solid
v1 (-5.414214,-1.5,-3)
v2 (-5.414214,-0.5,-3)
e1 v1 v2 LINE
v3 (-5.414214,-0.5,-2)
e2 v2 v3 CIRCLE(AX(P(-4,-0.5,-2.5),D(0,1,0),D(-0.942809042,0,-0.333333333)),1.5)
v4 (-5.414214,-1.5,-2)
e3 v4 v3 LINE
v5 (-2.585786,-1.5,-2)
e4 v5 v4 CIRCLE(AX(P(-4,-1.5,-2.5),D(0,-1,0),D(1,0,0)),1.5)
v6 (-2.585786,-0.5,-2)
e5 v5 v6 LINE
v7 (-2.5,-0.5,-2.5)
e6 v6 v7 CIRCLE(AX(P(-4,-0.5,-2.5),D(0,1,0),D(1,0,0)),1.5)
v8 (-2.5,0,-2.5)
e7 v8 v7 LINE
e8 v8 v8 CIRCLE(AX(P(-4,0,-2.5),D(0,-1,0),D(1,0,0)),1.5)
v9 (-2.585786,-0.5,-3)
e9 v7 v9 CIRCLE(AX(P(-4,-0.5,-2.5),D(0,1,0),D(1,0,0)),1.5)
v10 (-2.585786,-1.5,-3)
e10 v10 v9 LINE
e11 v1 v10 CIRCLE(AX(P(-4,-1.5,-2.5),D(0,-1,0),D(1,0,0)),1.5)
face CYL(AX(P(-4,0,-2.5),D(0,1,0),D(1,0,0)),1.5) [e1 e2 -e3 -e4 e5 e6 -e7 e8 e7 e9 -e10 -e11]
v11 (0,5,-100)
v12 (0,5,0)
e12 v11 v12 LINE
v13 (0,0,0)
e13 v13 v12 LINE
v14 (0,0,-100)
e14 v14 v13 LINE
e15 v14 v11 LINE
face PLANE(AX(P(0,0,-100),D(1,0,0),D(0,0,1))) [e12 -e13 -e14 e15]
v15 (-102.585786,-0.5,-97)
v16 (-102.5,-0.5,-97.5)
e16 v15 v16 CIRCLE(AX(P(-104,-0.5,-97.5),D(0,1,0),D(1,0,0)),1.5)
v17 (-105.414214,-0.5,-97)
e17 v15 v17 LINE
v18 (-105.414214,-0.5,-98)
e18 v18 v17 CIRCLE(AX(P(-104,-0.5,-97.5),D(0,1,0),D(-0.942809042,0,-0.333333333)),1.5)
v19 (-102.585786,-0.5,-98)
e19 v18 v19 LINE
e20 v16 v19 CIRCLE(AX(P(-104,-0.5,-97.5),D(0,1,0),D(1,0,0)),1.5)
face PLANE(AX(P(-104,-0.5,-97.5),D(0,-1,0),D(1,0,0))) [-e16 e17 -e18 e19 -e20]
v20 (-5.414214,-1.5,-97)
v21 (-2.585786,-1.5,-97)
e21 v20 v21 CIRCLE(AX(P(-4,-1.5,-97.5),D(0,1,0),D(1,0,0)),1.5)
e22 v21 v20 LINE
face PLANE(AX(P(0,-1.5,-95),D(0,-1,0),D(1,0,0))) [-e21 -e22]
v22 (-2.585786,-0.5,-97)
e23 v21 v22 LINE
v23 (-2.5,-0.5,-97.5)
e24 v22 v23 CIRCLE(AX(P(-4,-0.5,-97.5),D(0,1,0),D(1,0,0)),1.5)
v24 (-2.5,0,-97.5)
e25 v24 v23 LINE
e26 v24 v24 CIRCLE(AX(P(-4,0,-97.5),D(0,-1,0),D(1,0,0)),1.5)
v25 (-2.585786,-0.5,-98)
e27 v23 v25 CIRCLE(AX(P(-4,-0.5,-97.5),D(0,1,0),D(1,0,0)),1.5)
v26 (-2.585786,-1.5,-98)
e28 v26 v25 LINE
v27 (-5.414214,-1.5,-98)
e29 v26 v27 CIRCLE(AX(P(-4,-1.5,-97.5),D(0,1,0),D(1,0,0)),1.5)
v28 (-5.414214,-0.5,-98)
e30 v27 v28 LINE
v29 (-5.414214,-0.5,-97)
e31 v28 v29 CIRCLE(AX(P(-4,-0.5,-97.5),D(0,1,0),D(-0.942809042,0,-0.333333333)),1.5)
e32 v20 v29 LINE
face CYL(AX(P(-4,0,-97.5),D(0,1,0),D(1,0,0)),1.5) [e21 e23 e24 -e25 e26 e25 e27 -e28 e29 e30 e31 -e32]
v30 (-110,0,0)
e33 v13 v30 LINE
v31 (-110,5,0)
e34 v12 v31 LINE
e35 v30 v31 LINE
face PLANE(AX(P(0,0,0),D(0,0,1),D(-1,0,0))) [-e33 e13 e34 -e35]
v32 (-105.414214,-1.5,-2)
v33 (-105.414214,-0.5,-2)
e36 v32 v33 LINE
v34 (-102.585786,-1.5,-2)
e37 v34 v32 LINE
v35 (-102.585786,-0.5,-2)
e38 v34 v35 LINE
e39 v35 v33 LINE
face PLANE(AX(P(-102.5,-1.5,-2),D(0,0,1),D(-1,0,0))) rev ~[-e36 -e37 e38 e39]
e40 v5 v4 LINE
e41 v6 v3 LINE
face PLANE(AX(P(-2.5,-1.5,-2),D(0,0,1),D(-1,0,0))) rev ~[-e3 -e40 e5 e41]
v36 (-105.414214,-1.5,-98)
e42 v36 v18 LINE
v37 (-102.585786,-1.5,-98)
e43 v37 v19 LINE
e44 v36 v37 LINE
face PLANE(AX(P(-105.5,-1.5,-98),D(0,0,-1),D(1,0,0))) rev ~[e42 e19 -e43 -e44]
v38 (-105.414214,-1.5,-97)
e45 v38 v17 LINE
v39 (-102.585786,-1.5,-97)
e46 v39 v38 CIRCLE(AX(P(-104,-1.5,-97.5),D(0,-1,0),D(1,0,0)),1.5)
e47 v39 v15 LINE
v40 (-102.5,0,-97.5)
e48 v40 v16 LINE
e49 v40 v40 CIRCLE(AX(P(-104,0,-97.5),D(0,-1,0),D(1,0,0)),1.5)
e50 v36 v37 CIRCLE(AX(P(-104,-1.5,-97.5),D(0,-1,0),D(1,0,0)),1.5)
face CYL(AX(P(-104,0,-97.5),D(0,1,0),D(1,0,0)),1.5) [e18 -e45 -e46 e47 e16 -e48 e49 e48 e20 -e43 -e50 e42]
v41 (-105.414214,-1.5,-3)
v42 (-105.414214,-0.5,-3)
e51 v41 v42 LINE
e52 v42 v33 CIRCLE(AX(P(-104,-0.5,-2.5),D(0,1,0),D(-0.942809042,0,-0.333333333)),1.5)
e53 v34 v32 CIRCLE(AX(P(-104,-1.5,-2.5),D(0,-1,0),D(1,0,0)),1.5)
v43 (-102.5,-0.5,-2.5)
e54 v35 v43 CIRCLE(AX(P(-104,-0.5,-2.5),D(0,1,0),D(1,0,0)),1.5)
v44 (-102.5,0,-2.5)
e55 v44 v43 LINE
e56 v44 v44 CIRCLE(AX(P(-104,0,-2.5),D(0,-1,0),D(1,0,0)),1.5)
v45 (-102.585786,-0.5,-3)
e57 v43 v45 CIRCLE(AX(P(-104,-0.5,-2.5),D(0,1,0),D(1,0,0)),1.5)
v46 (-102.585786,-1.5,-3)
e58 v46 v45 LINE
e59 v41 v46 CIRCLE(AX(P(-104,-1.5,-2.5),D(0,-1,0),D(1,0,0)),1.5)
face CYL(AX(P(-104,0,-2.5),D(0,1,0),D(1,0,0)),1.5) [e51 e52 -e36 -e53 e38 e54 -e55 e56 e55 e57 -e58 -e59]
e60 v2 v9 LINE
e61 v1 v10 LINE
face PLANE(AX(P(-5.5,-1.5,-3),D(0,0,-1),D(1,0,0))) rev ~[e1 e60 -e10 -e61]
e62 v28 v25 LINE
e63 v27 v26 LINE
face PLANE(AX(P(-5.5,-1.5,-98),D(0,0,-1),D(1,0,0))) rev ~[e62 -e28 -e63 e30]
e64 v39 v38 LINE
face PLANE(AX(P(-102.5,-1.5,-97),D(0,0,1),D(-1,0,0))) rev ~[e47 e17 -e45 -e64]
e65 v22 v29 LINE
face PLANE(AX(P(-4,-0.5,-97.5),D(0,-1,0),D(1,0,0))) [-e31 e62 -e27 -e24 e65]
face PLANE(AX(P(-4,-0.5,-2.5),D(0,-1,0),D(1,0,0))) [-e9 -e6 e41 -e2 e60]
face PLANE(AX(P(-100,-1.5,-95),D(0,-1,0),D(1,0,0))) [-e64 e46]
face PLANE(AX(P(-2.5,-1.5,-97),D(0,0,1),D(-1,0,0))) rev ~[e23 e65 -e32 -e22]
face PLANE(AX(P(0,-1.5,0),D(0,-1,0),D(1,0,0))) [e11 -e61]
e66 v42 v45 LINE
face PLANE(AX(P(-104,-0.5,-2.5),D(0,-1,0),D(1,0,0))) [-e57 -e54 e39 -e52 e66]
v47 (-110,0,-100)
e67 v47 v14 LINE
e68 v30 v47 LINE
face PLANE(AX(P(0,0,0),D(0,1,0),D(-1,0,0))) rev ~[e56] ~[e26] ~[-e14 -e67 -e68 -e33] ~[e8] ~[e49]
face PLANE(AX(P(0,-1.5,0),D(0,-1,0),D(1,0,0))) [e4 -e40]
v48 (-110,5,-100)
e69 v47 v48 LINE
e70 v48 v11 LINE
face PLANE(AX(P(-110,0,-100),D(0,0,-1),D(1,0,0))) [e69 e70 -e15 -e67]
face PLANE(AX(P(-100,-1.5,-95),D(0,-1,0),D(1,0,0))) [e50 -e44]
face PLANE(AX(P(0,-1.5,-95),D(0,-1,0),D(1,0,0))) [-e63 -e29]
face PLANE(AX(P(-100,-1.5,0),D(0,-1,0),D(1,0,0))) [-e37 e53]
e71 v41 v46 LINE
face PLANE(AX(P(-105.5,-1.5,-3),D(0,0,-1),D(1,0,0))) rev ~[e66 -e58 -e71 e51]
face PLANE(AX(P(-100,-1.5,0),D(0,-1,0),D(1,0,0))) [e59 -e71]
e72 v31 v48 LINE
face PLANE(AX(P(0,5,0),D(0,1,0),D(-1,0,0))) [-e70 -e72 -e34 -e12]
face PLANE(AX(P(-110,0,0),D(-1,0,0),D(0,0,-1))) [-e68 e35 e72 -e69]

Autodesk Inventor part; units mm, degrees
ref_plane "YZ Plane" through (0, 0, 0) normal (1, 0, 0) x (0, 1, 0)
ref_plane "XZ Plane" through (0, 0, 0) normal (0, 1, 0) x (-1, 0, 0)
ref_plane "XY Plane" through (0, 0, 0) normal (0, 0, 1) x (1, 0, 0)
sketch "Sketch1" plane through (0, 0, 0) normal (0, 1, 0) x (-1, 0, 0)
  line L0 (0, 0) -> (110, 0)
  line L1 (110, 0) -> (110, -100)
  line L2 (110, -100) -> (0, -100)
  line L3 (0, -100) -> (0, 0)
  dimension "d0" = 110
  dimension "d1" = 100
extrude "Extrusion1" add sketch "Sketch1" along normal blind 5
sketch "Sketch2" plane through (0, 5, 0) normal (0, 1, 0) x (1, 0, 0)
  point P0 (0, 0)
sketch "Sketch3" plane through (0, 0, 0) normal (0, -1, 0) x (1, 0, 0)
  circle A0 centre (-4, -2.5) radius 1.5
  point P0 (0, 0)
  dimension "d4" = 3
extrude "Extrusion2" add sketch "Sketch3" along normal blind 1.5
sketch "Sketch4" plane through (-4, -1.5, -2.5) normal (0, -1, 0) x (1, 0, 0)
  point P0 (4, 2.5)
sketch "Sketch5" plane through (-4, -1.5, -2.5) normal (0, -1, 0) x (1, 0, 0)
  line L0 (1.5, 0.5) -> (-1.5, 0.5)
  line L1 (-1.5, 0.5) -> (-1.5, -0.5)
  line L2 (-1.5, -0.5) -> (1.5, -0.5)
  line L3 (1.5, -0.5) -> (1.5, 0.5)
  line L4 (1.5, 0.5) -> (-1.5, -0.5) construction
  line L5 (-1.5, 0.5) -> (1.5, -0.5) construction
  point P0 (4, 2.5)
  point P1 (0, 0)
  dimension "d7" = 1
extrude "Extrusion3" cut sketch "Sketch5" against normal blind 1
pattern_linear "Rectangular Pattern1" count 2 spacing 100 along (-1, 0, 0) of "Extrusion3", "Extrusion2"
pattern_linear "Rectangular Pattern2" count 2 spacing 95 along (0, 0, -1) of "Extrusion2", "Extrusion3"
pattern_linear "Rectangular Pattern3" count 2 spacing 95 along (0, 0, -1) of "Extrusion3", "Extrusion2", "Rectangular Pattern1"
properties part number "bottom part"
